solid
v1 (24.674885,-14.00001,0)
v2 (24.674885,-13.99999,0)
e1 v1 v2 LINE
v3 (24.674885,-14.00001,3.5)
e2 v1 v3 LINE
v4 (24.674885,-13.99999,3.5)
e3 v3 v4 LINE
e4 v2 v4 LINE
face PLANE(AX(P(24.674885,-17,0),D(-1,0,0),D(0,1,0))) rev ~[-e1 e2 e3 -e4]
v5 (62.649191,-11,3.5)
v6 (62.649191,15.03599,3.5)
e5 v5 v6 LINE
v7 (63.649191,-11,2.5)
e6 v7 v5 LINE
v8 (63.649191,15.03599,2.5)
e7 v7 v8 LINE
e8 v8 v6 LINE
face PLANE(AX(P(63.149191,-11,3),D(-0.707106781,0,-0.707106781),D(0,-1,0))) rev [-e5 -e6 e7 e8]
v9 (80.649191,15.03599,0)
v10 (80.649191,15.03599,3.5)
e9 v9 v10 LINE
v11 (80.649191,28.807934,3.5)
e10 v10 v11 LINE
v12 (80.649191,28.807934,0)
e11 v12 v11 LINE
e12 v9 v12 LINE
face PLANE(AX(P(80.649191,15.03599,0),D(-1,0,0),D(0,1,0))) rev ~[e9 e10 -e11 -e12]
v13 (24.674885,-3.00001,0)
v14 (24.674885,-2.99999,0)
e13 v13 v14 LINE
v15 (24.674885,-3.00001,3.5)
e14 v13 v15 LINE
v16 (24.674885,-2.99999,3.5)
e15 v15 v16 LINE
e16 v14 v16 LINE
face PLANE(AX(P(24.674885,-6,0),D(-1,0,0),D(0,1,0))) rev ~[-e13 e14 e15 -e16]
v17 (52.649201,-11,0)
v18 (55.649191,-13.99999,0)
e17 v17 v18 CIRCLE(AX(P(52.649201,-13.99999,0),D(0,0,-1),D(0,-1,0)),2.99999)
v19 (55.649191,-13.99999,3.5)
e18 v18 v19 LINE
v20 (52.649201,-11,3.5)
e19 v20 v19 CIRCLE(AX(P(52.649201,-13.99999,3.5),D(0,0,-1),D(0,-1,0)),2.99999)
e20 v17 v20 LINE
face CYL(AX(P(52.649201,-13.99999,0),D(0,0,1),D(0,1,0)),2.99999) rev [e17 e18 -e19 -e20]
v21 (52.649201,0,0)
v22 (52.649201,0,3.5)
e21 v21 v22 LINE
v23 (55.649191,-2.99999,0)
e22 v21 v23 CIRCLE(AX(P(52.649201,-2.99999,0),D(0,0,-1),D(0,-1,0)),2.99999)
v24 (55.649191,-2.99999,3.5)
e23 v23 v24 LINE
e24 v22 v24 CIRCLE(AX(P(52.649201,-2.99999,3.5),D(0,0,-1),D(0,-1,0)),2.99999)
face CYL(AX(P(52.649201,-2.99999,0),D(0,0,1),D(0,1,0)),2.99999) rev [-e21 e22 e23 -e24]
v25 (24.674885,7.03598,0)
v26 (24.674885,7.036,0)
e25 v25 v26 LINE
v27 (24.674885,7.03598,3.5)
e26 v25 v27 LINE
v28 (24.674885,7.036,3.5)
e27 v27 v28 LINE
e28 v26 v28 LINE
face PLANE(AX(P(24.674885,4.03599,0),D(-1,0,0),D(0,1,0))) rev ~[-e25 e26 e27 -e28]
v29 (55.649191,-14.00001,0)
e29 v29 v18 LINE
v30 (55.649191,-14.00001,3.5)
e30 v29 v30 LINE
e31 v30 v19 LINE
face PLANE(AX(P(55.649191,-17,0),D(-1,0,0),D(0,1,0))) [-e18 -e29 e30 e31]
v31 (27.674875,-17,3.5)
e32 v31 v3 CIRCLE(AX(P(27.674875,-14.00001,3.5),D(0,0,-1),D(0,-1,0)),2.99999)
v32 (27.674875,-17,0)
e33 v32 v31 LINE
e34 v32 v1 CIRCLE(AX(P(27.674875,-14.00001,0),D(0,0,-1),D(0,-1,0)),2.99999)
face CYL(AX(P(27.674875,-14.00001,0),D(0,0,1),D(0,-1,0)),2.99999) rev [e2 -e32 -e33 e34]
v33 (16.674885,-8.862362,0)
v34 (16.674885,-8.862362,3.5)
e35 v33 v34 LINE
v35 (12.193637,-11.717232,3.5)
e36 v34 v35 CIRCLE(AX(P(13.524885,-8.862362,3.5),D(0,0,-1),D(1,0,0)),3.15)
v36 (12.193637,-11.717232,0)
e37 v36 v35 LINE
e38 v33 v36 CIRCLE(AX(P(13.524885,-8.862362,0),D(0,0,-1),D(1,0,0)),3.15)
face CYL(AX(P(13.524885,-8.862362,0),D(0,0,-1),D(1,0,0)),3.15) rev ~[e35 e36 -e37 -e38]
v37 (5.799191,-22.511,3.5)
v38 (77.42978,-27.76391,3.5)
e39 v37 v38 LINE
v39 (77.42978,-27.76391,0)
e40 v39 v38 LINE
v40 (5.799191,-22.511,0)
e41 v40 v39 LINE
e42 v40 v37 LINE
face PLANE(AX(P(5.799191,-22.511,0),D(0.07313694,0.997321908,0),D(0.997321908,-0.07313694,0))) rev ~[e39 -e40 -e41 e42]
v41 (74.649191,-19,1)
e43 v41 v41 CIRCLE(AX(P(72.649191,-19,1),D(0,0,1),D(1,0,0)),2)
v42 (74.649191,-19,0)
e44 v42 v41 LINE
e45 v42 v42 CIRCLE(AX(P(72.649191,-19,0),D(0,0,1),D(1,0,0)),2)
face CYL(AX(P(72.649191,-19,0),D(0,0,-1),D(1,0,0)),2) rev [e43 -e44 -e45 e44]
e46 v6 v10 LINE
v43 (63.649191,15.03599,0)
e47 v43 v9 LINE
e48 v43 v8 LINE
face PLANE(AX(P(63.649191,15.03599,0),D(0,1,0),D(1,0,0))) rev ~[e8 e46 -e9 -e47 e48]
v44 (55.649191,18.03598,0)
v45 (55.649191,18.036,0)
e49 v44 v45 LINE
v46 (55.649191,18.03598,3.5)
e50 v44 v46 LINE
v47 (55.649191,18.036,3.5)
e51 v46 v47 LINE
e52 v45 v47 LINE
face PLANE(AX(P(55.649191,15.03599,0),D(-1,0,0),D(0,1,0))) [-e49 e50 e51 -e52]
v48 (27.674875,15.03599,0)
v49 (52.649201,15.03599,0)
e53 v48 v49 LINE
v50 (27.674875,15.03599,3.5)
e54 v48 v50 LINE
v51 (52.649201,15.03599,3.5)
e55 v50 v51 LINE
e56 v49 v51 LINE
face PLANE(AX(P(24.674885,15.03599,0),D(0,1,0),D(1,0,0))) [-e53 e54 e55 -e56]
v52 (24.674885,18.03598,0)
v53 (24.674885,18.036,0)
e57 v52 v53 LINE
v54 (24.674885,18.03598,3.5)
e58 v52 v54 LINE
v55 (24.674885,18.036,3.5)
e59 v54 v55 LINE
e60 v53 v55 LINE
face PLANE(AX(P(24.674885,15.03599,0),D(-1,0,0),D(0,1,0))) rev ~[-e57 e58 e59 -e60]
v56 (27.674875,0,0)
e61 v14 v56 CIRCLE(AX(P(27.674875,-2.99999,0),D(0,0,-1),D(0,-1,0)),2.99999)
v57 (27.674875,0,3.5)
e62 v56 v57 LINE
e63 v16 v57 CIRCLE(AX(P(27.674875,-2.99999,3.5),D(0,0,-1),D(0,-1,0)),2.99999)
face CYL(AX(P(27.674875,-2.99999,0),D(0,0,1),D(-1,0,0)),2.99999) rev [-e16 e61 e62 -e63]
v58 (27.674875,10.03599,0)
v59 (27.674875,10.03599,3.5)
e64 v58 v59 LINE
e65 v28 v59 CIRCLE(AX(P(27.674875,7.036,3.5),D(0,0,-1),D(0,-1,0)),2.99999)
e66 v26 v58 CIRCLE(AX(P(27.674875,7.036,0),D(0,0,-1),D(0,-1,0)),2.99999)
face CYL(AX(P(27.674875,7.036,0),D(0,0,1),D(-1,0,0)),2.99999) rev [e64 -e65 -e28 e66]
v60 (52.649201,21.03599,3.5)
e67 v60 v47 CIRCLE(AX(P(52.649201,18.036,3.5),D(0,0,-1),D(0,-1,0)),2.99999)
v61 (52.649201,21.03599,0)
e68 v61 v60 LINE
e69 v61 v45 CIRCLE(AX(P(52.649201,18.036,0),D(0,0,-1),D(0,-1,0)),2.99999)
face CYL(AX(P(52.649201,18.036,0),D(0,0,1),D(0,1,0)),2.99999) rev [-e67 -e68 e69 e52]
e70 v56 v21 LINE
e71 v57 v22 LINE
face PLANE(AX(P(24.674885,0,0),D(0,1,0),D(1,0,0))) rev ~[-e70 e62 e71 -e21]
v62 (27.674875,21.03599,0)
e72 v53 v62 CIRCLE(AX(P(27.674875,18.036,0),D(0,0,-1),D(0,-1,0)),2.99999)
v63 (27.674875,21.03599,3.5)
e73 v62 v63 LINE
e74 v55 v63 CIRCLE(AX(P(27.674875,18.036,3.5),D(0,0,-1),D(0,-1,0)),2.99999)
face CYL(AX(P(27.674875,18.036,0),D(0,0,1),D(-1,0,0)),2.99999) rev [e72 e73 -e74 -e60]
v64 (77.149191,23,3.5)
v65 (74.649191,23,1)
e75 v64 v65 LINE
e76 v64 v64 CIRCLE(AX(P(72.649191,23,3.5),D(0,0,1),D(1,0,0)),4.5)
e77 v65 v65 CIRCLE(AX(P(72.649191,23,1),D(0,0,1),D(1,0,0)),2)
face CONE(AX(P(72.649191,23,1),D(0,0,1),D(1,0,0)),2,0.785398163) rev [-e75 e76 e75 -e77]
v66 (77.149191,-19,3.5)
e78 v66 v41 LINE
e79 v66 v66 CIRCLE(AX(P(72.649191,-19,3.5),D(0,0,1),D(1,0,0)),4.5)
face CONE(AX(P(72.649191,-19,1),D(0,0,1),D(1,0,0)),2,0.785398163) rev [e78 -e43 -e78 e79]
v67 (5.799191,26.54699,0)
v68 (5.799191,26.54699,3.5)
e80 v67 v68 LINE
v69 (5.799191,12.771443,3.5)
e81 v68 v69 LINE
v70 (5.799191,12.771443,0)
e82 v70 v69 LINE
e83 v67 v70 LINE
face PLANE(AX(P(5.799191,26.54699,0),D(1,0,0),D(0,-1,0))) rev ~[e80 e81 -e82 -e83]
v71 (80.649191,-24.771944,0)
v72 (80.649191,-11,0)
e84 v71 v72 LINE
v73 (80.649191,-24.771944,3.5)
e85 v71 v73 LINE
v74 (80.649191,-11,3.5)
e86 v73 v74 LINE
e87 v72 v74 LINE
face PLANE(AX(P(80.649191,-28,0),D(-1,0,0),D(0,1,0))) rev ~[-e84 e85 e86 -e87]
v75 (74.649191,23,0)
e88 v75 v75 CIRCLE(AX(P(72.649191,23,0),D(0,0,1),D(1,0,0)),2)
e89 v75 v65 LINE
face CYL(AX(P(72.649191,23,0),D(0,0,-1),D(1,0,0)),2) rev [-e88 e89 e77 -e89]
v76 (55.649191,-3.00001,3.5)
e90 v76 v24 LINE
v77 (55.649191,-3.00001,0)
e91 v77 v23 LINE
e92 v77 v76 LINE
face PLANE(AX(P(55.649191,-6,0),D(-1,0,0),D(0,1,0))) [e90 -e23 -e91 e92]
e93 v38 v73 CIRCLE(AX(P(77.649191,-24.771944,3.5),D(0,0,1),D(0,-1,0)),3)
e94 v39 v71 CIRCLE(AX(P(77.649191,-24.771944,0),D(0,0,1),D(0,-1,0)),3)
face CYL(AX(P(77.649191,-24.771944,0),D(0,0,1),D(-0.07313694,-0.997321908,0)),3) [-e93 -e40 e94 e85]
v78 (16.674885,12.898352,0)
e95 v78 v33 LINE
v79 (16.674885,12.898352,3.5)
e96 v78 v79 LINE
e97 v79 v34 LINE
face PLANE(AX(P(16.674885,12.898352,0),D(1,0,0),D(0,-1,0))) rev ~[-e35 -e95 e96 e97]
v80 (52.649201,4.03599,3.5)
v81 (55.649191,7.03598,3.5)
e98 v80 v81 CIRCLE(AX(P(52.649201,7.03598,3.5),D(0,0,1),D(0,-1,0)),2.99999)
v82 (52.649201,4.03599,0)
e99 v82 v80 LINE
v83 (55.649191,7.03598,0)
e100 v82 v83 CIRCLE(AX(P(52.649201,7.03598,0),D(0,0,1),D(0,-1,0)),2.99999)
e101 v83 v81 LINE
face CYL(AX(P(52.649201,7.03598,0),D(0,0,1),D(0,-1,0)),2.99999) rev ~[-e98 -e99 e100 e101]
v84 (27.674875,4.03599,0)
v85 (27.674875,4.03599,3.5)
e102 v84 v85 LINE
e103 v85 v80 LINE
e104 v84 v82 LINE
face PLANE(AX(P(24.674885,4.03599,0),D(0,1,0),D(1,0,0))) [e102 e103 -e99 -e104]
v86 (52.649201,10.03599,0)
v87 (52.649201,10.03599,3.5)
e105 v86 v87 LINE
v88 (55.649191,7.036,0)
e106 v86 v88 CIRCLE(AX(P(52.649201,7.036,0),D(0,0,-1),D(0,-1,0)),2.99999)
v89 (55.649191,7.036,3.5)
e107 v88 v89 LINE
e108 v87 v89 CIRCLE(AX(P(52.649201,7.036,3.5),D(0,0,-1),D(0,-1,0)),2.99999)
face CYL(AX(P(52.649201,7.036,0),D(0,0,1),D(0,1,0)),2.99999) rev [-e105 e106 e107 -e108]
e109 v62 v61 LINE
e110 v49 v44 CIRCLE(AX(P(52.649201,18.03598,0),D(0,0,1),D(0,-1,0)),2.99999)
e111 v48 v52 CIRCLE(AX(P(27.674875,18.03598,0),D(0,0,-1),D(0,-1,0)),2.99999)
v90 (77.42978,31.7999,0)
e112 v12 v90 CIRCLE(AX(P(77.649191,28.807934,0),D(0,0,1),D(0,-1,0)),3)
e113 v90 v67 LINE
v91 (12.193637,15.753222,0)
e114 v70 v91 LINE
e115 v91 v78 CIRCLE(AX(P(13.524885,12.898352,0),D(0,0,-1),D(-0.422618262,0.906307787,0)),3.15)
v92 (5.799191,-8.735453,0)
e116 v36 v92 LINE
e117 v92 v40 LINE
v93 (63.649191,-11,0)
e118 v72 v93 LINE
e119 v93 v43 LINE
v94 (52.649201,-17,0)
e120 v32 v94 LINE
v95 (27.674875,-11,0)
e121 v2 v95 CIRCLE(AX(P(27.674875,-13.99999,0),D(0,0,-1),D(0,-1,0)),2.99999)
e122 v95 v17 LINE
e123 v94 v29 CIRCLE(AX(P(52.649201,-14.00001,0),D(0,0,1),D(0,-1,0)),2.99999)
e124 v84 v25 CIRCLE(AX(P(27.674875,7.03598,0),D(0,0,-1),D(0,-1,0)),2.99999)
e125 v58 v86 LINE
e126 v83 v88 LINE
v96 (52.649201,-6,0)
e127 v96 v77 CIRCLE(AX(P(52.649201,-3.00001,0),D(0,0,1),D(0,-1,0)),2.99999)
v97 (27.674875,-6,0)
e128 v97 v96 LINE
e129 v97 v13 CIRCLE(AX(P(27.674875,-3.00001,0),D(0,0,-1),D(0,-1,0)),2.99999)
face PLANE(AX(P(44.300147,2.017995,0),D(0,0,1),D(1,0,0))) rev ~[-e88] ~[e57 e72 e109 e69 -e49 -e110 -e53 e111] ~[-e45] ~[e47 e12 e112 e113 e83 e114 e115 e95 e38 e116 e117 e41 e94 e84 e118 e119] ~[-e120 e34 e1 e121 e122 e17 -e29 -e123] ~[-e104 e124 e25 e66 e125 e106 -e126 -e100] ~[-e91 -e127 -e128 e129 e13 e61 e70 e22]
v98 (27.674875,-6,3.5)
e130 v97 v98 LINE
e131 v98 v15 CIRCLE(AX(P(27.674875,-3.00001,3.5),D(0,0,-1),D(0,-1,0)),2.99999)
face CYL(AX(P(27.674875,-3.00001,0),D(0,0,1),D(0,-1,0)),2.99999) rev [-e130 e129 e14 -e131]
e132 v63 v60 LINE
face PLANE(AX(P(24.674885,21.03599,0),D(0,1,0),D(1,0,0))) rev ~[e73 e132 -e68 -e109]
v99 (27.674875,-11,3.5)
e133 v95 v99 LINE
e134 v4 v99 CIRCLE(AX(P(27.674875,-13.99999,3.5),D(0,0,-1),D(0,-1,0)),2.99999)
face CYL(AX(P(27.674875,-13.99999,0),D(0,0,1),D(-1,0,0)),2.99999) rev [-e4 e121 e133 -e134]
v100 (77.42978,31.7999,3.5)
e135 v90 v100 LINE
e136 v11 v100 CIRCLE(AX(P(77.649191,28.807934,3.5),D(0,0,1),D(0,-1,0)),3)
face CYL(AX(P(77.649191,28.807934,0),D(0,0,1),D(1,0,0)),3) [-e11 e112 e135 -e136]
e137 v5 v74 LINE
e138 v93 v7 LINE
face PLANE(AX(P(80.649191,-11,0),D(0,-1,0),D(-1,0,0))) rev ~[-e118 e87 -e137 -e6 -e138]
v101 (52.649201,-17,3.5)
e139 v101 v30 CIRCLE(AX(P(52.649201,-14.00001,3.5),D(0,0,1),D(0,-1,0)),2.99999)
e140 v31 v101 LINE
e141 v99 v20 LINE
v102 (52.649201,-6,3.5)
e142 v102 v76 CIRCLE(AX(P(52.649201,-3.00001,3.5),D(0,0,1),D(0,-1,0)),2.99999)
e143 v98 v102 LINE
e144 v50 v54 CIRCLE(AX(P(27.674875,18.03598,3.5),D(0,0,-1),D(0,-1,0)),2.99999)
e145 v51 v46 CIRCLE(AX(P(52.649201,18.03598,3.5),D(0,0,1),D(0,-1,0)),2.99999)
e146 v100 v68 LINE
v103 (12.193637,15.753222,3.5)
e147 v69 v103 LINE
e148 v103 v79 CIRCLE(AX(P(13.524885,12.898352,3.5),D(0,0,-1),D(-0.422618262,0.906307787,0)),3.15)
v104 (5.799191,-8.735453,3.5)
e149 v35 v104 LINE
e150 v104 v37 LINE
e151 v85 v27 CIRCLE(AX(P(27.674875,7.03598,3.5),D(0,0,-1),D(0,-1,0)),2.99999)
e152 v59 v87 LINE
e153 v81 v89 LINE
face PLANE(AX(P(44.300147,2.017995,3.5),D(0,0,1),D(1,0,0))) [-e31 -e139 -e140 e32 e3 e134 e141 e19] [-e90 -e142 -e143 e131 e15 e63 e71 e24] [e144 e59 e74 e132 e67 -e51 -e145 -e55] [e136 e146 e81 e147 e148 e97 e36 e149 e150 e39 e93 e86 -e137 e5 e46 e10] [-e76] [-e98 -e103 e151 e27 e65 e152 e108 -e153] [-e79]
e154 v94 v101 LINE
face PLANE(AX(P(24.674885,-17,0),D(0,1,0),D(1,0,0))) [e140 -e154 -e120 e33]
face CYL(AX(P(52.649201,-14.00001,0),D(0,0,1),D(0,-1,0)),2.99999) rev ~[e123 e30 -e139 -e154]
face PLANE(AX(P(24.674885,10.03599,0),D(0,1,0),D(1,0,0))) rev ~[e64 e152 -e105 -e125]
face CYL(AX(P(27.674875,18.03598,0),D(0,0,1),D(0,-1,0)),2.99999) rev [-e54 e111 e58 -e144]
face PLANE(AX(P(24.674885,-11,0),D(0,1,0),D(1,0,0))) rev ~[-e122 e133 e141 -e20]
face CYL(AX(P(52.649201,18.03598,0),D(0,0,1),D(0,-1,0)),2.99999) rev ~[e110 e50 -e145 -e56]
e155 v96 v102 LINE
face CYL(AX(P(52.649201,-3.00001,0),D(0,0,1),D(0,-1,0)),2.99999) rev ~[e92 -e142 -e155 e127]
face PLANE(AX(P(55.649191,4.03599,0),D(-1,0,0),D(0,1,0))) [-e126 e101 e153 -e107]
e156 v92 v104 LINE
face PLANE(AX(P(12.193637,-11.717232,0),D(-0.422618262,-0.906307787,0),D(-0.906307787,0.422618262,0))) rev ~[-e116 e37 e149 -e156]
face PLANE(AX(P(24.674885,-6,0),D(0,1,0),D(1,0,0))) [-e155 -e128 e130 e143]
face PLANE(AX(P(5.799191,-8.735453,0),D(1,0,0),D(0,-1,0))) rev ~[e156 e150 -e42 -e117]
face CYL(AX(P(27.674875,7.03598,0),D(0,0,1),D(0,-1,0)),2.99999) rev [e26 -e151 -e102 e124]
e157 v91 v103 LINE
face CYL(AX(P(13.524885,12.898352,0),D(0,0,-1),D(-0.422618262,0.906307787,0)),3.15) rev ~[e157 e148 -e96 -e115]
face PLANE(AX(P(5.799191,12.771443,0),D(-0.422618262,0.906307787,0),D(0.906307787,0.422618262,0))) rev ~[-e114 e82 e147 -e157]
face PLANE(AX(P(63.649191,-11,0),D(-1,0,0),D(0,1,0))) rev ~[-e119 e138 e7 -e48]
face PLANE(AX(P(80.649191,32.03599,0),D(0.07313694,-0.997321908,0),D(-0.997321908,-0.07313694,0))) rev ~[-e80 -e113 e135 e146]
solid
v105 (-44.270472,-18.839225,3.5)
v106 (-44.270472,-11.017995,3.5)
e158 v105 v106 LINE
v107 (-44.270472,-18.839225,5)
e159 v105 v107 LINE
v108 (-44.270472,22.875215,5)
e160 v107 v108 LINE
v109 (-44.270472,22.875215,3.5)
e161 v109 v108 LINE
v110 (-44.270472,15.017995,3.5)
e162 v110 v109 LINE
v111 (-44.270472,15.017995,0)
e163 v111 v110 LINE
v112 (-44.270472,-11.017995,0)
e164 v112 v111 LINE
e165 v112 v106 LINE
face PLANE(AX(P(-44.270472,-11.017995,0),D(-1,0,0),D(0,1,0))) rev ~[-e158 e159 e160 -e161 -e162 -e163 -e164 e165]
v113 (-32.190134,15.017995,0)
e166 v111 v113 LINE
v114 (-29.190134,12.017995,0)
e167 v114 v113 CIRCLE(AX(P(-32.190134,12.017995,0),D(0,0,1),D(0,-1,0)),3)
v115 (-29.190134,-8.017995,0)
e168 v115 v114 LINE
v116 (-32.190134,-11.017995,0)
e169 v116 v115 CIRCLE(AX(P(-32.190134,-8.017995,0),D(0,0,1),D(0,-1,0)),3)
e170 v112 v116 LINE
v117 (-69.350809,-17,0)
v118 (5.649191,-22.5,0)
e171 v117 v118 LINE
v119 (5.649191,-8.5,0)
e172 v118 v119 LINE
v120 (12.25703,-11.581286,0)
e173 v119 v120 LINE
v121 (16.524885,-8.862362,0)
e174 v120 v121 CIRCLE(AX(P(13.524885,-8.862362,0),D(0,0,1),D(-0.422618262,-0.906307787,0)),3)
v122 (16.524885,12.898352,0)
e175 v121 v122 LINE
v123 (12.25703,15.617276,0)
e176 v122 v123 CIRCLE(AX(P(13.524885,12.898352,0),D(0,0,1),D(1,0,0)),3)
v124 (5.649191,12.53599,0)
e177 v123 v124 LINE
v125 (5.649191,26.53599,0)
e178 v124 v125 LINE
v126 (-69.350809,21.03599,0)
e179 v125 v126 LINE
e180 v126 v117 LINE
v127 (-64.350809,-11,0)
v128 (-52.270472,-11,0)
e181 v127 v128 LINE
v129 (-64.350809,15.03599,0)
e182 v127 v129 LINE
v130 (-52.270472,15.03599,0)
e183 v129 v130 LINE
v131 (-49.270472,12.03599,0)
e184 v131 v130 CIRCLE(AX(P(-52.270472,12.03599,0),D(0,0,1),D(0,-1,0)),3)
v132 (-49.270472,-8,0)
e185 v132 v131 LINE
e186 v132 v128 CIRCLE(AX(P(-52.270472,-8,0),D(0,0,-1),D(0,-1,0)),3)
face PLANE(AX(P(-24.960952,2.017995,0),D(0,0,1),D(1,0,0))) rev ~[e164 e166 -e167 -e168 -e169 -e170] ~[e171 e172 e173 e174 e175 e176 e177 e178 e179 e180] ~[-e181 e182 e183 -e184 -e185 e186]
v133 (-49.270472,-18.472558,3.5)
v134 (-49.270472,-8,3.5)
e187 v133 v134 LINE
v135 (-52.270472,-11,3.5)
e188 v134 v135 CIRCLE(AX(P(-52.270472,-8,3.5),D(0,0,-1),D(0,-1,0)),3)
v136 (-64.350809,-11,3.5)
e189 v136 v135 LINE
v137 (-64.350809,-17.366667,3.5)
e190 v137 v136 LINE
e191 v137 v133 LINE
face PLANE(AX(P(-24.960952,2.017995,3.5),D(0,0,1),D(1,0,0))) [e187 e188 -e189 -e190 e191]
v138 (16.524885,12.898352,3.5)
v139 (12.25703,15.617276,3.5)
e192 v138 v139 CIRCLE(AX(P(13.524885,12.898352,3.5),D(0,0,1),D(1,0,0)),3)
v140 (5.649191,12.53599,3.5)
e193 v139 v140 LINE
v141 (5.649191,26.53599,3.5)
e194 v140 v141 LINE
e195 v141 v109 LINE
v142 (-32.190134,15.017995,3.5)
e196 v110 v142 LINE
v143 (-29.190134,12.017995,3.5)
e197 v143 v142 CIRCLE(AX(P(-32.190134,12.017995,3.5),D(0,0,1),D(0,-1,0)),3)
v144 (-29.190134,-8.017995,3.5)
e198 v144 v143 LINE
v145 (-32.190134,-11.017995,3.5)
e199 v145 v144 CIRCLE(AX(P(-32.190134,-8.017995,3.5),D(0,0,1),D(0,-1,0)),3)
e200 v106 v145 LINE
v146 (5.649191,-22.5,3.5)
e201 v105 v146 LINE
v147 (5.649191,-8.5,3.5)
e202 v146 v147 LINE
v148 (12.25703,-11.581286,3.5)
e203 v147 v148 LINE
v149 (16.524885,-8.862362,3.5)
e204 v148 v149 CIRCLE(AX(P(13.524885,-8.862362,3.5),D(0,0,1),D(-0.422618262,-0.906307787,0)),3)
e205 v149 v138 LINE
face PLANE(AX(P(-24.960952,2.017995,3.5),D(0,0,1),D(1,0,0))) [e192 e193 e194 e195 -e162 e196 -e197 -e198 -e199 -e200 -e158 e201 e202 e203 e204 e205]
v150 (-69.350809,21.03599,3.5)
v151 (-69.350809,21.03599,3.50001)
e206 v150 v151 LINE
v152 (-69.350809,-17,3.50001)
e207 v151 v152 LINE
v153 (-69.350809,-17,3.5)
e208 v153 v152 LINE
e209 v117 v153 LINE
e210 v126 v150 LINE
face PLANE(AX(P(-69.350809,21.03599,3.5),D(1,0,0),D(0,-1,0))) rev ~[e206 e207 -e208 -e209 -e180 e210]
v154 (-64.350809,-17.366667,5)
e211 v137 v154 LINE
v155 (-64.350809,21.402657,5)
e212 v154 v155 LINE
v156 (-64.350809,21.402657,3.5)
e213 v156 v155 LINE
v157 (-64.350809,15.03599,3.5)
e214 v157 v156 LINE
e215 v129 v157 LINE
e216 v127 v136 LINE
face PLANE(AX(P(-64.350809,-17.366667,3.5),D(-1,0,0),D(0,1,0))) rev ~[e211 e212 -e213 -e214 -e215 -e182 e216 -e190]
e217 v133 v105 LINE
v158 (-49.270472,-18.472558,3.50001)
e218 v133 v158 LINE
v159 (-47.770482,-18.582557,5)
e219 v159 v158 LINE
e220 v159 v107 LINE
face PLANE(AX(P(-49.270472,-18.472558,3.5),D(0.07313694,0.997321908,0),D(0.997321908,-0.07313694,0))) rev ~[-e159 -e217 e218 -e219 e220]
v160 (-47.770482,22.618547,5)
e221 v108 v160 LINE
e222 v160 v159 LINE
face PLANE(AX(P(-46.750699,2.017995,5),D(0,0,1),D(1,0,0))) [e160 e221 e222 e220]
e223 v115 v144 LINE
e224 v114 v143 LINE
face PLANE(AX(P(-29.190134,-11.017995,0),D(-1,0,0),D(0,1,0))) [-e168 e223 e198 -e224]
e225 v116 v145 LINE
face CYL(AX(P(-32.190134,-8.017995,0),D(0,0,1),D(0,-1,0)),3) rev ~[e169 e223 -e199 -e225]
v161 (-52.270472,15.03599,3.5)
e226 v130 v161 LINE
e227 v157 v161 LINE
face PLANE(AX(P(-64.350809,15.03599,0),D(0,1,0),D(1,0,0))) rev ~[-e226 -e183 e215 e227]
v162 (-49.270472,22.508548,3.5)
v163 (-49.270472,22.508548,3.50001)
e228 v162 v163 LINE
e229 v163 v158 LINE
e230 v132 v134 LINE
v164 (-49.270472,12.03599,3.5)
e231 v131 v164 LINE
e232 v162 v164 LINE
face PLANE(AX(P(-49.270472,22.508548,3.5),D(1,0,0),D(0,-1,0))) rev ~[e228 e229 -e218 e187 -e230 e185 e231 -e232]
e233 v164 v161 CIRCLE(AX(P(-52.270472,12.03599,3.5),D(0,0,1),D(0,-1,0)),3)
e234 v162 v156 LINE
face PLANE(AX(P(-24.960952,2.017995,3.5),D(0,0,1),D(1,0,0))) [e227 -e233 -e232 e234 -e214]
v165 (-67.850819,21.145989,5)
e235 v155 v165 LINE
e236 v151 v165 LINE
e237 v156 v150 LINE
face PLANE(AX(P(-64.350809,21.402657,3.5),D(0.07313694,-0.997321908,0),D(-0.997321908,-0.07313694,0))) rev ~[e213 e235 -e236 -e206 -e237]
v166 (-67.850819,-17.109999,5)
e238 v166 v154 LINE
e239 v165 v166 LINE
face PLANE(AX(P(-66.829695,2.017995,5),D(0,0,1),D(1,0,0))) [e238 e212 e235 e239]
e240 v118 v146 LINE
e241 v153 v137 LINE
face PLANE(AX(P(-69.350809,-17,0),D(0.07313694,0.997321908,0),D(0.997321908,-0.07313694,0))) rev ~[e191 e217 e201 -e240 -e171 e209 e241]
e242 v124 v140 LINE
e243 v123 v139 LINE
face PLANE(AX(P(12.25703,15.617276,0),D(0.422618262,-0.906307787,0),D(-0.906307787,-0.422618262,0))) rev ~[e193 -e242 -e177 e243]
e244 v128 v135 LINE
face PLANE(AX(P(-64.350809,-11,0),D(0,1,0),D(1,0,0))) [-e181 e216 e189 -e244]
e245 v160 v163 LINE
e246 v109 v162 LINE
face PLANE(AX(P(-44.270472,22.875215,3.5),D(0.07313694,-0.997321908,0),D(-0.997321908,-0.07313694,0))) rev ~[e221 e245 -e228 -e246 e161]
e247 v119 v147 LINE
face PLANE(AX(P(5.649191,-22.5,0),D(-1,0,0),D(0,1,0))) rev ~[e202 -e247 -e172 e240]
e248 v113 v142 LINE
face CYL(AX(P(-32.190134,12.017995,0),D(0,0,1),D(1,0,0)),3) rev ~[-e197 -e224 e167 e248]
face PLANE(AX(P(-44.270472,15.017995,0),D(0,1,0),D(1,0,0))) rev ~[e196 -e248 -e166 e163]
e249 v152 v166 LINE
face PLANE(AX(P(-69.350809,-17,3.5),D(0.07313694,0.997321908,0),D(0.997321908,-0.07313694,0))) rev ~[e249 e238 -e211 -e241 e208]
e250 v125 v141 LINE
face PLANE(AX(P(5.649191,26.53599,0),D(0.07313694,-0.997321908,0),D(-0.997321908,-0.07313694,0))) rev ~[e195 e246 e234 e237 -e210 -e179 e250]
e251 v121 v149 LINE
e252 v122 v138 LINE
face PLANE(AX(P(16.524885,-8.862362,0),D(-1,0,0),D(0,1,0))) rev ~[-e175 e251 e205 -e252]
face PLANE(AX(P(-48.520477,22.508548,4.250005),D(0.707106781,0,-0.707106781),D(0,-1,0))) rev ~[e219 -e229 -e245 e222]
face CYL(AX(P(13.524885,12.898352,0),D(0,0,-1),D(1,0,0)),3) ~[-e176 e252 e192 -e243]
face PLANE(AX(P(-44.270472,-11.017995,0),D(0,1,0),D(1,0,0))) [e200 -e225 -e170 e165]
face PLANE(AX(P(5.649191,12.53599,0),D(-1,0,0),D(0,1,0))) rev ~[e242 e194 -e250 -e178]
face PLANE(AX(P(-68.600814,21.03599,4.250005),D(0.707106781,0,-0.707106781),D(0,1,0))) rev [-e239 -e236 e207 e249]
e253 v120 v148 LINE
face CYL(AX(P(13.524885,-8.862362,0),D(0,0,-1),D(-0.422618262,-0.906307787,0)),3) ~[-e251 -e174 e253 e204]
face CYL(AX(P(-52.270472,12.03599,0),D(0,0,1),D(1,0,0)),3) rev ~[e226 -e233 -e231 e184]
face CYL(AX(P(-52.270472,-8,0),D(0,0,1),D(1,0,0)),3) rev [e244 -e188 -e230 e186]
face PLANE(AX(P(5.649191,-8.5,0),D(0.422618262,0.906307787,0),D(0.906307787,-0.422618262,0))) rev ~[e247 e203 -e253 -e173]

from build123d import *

# Parameters (mm, degrees)
F0_W     = 15.0803372804
F0_H     = 26.0359900557
F1_DEPTH = 3.5
F0_W_2   = 30.9743065556
F0_H_2   = 6
F0_R     = 2
F2_SIZE  = 1
F3_SIZE  = 2.5
F5_DEPTH = 1.5
F6_R     = 3
F7_SIZE  = 1.49999
F8_R     = 3
F9_R     = 2.99999


# Not quite as in the source:
# - a fillet or chamfer is up to 0.001 mm smaller than in the source, because OpenCascade refuses the exact size


with BuildPart() as f1:
    # F0 (on Top) → F1 (new body)
    with BuildSketch(Plane.XY):
        with BuildLine():
            Line((5.6491911411, 26.5359900557), (-69.3508088589, 21.0359900557))
            Line((-69.3508088589, 21.0359900557), (-69.3508088589, -17))
            Line((-69.3508088589, -17), (5.6491911411, -22.5))
            Line((5.6491911411, -22.5), (5.6491911411, -8.5))
            Line((5.6491911411, -8.5), (12.2570298003, -11.5812857706))
            ThreePointArc((12.2570298003, -11.5812857706), (15.1367834106, -11.392536747), (16.5248845856, -8.8623624095))
            Line((16.5248845856, -8.8623624095), (16.5248845856, 12.8983524652))
            ThreePointArc((16.5248845856, 12.8983524652), (15.1367834106, 15.4285268026), (12.2570298003, 15.6172758263))
            Line((12.2570298003, 15.6172758263), (5.6491911411, 12.5359900557))
            Line((5.6491911411, 12.5359900557), (5.6491911411, 26.5359900557))
        make_face()
        with Locations((-56.8106402187, 2.0179950278)):
            Rectangle(F0_W, F0_H, mode=Mode.SUBTRACT)
        with Locations((-36.7303029383, 2.0000000728)):
            Rectangle(F0_W, F0_H, mode=Mode.SUBTRACT)
    extrude(amount=F1_DEPTH)

    # F4 (on face) → F5 (join)
    with BuildSketch(Plane.XY.offset(3.5)):
        Polygon((-64.3508088589, 21.4026567223), (-69.3508088589, 21.0359900557), (-69.3508088589, -17), (-64.3508088589, -17.3666666667), (-64.3508088589, -11), (-64.3508088589, 15.0359900557), align=None)
        Polygon((-44.2704715785, 22.8752147895), (-49.2704715785, 22.5085481229), (-49.2704715785, 15.0359900557), (-49.2704715785, -11), (-49.2704715785, -18.4725580672), (-44.2704715785, -18.8392247339), (-44.2704715785, -11.0179949551), (-44.2704715785, 15.0179951006), align=None)
    extrude(amount=F5_DEPTH)

    # F6
    f6_edges = [f1.edges().sort_by_distance(p)[0] for p in [
        (-49.270472, 15.03599, 1.75),
        (-29.190134, 15.017995, 1.75),
        (-49.270472, -11, 1.75),
        (-29.190134, -11.017995, 1.75),
    ]]
    fillet(f6_edges, radius=F6_R)

    # F7 (size 1.5 in the source; OpenCascade refuses exactly that, so slightly less here)
    f7_edges = [f1.edges().sort_by_distance(p)[0] for p in [
        (-69.350809, 2.017995, 5),
        (-49.270472, 2.017995, 5),
    ]]
    chamfer(f7_edges, length=F7_SIZE)


with BuildPart() as f1b:
    # F0 (on Top) → F1, piece 2 (new body)
    with BuildSketch(Plane.XY):
        with BuildLine():
            Line((5.7991911411, -22.511), (80.6491911411, -28))
            Line((80.6491911411, -28), (80.6491911411, -11))
            Line((80.6491911411, -11), (63.6491911411, -11))
            Line((63.6491911411, -11), (63.6491911411, 15.0359900557))
            Line((63.6491911411, 15.0359900557), (80.6491911411, 15.0359900557))
            Line((80.6491911411, 15.0359900557), (80.6491911411, 32.0359900557))
            Line((80.6491911411, 32.0359900557), (5.7991911411, 26.5469900557))
            Line((5.7991911411, 26.5469900557), (5.7991911411, 12.7714428922))
            Line((5.7991911411, 12.7714428922), (12.1936370611, 15.7532219944))
            ThreePointArc((12.1936370611, 15.7532219944), (15.2173783519, 15.5550355195), (16.6748845856, 12.8983524652))
            Line((16.6748845856, 12.8983524652), (16.6748845856, -8.8623624095))
            ThreePointArc((16.6748845856, -8.8623624095), (15.2173783519, -11.5190454638), (12.1936370611, -11.7172319387))
            Line((12.1936370611, -11.7172319387), (5.7991911411, -8.7354528366))
            Line((5.7991911411, -8.7354528366), (5.7991911411, -22.511))
        make_face()
        with Locations((40.1620378633, -14)):
            Rectangle(F0_W_2, F0_H_2, mode=Mode.SUBTRACT)
        with Locations((72.6491911411, -19)):
            Circle(F0_R, mode=Mode.SUBTRACT)
        with Locations((40.1620378633, -3)):
            Rectangle(F0_W_2, F0_H_2, mode=Mode.SUBTRACT)
        with Locations((40.1620378633, 7.0359900557)):
            Rectangle(F0_W_2, F0_H_2, mode=Mode.SUBTRACT)
        with Locations((40.1620378633, 18.0359900557)):
            Rectangle(F0_W_2, F0_H_2, mode=Mode.SUBTRACT)
        with Locations((72.6491911411, 23)):
            Circle(F0_R, mode=Mode.SUBTRACT)
    extrude(amount=F1_DEPTH)

    # F2
    f2_edges = [f1b.edges().sort_by_distance(p)[0] for p in [
        (63.649191, 2.017995, 3.5),
    ]]
    chamfer(f2_edges, length=F2_SIZE)

    # F3
    f3_edges = [f1b.edges().sort_by_distance(p)[0] for p in [
        (70.649191, 23, 3.5),
        (70.649191, -19, 3.5),
    ]]
    chamfer(f3_edges, length=F3_SIZE)

    # F8
    f8_edges = [f1b.edges().sort_by_distance(p)[0] for p in [
        (80.649191, 32.03599, 1.75),
        (80.649191, -28, 1.75),
    ]]
    fillet(f8_edges, radius=F8_R)

    # F9 (radius 3 in the source; OpenCascade refuses exactly that, so slightly less here)
    f9_edges = [f1b.edges().sort_by_distance(p)[0] for p in [
        (24.674885, 21.03599, 1.75),
        (24.674885, 10.03599, 1.75),
        (24.674885, 0, 1.75),
        (24.674885, -11, 1.75),
        (24.674885, 15.03599, 1.75),
        (24.674885, 4.03599, 1.75),
        (24.674885, -6, 1.75),
        (24.674885, -17, 1.75),
        (55.649191, 21.03599, 1.75),
        (55.649191, 10.03599, 1.75),
        (55.649191, 0, 1.75),
        (55.649191, -11, 1.75),
        (55.649191, -17, 1.75),
        (55.649191, -6, 1.75),
        (55.649191, 4.03599, 1.75),
        (55.649191, 15.03599, 1.75),
    ]]
    fillet(f9_edges, radius=F9_R)


solid = Compound([f1.part, f1b.part])
